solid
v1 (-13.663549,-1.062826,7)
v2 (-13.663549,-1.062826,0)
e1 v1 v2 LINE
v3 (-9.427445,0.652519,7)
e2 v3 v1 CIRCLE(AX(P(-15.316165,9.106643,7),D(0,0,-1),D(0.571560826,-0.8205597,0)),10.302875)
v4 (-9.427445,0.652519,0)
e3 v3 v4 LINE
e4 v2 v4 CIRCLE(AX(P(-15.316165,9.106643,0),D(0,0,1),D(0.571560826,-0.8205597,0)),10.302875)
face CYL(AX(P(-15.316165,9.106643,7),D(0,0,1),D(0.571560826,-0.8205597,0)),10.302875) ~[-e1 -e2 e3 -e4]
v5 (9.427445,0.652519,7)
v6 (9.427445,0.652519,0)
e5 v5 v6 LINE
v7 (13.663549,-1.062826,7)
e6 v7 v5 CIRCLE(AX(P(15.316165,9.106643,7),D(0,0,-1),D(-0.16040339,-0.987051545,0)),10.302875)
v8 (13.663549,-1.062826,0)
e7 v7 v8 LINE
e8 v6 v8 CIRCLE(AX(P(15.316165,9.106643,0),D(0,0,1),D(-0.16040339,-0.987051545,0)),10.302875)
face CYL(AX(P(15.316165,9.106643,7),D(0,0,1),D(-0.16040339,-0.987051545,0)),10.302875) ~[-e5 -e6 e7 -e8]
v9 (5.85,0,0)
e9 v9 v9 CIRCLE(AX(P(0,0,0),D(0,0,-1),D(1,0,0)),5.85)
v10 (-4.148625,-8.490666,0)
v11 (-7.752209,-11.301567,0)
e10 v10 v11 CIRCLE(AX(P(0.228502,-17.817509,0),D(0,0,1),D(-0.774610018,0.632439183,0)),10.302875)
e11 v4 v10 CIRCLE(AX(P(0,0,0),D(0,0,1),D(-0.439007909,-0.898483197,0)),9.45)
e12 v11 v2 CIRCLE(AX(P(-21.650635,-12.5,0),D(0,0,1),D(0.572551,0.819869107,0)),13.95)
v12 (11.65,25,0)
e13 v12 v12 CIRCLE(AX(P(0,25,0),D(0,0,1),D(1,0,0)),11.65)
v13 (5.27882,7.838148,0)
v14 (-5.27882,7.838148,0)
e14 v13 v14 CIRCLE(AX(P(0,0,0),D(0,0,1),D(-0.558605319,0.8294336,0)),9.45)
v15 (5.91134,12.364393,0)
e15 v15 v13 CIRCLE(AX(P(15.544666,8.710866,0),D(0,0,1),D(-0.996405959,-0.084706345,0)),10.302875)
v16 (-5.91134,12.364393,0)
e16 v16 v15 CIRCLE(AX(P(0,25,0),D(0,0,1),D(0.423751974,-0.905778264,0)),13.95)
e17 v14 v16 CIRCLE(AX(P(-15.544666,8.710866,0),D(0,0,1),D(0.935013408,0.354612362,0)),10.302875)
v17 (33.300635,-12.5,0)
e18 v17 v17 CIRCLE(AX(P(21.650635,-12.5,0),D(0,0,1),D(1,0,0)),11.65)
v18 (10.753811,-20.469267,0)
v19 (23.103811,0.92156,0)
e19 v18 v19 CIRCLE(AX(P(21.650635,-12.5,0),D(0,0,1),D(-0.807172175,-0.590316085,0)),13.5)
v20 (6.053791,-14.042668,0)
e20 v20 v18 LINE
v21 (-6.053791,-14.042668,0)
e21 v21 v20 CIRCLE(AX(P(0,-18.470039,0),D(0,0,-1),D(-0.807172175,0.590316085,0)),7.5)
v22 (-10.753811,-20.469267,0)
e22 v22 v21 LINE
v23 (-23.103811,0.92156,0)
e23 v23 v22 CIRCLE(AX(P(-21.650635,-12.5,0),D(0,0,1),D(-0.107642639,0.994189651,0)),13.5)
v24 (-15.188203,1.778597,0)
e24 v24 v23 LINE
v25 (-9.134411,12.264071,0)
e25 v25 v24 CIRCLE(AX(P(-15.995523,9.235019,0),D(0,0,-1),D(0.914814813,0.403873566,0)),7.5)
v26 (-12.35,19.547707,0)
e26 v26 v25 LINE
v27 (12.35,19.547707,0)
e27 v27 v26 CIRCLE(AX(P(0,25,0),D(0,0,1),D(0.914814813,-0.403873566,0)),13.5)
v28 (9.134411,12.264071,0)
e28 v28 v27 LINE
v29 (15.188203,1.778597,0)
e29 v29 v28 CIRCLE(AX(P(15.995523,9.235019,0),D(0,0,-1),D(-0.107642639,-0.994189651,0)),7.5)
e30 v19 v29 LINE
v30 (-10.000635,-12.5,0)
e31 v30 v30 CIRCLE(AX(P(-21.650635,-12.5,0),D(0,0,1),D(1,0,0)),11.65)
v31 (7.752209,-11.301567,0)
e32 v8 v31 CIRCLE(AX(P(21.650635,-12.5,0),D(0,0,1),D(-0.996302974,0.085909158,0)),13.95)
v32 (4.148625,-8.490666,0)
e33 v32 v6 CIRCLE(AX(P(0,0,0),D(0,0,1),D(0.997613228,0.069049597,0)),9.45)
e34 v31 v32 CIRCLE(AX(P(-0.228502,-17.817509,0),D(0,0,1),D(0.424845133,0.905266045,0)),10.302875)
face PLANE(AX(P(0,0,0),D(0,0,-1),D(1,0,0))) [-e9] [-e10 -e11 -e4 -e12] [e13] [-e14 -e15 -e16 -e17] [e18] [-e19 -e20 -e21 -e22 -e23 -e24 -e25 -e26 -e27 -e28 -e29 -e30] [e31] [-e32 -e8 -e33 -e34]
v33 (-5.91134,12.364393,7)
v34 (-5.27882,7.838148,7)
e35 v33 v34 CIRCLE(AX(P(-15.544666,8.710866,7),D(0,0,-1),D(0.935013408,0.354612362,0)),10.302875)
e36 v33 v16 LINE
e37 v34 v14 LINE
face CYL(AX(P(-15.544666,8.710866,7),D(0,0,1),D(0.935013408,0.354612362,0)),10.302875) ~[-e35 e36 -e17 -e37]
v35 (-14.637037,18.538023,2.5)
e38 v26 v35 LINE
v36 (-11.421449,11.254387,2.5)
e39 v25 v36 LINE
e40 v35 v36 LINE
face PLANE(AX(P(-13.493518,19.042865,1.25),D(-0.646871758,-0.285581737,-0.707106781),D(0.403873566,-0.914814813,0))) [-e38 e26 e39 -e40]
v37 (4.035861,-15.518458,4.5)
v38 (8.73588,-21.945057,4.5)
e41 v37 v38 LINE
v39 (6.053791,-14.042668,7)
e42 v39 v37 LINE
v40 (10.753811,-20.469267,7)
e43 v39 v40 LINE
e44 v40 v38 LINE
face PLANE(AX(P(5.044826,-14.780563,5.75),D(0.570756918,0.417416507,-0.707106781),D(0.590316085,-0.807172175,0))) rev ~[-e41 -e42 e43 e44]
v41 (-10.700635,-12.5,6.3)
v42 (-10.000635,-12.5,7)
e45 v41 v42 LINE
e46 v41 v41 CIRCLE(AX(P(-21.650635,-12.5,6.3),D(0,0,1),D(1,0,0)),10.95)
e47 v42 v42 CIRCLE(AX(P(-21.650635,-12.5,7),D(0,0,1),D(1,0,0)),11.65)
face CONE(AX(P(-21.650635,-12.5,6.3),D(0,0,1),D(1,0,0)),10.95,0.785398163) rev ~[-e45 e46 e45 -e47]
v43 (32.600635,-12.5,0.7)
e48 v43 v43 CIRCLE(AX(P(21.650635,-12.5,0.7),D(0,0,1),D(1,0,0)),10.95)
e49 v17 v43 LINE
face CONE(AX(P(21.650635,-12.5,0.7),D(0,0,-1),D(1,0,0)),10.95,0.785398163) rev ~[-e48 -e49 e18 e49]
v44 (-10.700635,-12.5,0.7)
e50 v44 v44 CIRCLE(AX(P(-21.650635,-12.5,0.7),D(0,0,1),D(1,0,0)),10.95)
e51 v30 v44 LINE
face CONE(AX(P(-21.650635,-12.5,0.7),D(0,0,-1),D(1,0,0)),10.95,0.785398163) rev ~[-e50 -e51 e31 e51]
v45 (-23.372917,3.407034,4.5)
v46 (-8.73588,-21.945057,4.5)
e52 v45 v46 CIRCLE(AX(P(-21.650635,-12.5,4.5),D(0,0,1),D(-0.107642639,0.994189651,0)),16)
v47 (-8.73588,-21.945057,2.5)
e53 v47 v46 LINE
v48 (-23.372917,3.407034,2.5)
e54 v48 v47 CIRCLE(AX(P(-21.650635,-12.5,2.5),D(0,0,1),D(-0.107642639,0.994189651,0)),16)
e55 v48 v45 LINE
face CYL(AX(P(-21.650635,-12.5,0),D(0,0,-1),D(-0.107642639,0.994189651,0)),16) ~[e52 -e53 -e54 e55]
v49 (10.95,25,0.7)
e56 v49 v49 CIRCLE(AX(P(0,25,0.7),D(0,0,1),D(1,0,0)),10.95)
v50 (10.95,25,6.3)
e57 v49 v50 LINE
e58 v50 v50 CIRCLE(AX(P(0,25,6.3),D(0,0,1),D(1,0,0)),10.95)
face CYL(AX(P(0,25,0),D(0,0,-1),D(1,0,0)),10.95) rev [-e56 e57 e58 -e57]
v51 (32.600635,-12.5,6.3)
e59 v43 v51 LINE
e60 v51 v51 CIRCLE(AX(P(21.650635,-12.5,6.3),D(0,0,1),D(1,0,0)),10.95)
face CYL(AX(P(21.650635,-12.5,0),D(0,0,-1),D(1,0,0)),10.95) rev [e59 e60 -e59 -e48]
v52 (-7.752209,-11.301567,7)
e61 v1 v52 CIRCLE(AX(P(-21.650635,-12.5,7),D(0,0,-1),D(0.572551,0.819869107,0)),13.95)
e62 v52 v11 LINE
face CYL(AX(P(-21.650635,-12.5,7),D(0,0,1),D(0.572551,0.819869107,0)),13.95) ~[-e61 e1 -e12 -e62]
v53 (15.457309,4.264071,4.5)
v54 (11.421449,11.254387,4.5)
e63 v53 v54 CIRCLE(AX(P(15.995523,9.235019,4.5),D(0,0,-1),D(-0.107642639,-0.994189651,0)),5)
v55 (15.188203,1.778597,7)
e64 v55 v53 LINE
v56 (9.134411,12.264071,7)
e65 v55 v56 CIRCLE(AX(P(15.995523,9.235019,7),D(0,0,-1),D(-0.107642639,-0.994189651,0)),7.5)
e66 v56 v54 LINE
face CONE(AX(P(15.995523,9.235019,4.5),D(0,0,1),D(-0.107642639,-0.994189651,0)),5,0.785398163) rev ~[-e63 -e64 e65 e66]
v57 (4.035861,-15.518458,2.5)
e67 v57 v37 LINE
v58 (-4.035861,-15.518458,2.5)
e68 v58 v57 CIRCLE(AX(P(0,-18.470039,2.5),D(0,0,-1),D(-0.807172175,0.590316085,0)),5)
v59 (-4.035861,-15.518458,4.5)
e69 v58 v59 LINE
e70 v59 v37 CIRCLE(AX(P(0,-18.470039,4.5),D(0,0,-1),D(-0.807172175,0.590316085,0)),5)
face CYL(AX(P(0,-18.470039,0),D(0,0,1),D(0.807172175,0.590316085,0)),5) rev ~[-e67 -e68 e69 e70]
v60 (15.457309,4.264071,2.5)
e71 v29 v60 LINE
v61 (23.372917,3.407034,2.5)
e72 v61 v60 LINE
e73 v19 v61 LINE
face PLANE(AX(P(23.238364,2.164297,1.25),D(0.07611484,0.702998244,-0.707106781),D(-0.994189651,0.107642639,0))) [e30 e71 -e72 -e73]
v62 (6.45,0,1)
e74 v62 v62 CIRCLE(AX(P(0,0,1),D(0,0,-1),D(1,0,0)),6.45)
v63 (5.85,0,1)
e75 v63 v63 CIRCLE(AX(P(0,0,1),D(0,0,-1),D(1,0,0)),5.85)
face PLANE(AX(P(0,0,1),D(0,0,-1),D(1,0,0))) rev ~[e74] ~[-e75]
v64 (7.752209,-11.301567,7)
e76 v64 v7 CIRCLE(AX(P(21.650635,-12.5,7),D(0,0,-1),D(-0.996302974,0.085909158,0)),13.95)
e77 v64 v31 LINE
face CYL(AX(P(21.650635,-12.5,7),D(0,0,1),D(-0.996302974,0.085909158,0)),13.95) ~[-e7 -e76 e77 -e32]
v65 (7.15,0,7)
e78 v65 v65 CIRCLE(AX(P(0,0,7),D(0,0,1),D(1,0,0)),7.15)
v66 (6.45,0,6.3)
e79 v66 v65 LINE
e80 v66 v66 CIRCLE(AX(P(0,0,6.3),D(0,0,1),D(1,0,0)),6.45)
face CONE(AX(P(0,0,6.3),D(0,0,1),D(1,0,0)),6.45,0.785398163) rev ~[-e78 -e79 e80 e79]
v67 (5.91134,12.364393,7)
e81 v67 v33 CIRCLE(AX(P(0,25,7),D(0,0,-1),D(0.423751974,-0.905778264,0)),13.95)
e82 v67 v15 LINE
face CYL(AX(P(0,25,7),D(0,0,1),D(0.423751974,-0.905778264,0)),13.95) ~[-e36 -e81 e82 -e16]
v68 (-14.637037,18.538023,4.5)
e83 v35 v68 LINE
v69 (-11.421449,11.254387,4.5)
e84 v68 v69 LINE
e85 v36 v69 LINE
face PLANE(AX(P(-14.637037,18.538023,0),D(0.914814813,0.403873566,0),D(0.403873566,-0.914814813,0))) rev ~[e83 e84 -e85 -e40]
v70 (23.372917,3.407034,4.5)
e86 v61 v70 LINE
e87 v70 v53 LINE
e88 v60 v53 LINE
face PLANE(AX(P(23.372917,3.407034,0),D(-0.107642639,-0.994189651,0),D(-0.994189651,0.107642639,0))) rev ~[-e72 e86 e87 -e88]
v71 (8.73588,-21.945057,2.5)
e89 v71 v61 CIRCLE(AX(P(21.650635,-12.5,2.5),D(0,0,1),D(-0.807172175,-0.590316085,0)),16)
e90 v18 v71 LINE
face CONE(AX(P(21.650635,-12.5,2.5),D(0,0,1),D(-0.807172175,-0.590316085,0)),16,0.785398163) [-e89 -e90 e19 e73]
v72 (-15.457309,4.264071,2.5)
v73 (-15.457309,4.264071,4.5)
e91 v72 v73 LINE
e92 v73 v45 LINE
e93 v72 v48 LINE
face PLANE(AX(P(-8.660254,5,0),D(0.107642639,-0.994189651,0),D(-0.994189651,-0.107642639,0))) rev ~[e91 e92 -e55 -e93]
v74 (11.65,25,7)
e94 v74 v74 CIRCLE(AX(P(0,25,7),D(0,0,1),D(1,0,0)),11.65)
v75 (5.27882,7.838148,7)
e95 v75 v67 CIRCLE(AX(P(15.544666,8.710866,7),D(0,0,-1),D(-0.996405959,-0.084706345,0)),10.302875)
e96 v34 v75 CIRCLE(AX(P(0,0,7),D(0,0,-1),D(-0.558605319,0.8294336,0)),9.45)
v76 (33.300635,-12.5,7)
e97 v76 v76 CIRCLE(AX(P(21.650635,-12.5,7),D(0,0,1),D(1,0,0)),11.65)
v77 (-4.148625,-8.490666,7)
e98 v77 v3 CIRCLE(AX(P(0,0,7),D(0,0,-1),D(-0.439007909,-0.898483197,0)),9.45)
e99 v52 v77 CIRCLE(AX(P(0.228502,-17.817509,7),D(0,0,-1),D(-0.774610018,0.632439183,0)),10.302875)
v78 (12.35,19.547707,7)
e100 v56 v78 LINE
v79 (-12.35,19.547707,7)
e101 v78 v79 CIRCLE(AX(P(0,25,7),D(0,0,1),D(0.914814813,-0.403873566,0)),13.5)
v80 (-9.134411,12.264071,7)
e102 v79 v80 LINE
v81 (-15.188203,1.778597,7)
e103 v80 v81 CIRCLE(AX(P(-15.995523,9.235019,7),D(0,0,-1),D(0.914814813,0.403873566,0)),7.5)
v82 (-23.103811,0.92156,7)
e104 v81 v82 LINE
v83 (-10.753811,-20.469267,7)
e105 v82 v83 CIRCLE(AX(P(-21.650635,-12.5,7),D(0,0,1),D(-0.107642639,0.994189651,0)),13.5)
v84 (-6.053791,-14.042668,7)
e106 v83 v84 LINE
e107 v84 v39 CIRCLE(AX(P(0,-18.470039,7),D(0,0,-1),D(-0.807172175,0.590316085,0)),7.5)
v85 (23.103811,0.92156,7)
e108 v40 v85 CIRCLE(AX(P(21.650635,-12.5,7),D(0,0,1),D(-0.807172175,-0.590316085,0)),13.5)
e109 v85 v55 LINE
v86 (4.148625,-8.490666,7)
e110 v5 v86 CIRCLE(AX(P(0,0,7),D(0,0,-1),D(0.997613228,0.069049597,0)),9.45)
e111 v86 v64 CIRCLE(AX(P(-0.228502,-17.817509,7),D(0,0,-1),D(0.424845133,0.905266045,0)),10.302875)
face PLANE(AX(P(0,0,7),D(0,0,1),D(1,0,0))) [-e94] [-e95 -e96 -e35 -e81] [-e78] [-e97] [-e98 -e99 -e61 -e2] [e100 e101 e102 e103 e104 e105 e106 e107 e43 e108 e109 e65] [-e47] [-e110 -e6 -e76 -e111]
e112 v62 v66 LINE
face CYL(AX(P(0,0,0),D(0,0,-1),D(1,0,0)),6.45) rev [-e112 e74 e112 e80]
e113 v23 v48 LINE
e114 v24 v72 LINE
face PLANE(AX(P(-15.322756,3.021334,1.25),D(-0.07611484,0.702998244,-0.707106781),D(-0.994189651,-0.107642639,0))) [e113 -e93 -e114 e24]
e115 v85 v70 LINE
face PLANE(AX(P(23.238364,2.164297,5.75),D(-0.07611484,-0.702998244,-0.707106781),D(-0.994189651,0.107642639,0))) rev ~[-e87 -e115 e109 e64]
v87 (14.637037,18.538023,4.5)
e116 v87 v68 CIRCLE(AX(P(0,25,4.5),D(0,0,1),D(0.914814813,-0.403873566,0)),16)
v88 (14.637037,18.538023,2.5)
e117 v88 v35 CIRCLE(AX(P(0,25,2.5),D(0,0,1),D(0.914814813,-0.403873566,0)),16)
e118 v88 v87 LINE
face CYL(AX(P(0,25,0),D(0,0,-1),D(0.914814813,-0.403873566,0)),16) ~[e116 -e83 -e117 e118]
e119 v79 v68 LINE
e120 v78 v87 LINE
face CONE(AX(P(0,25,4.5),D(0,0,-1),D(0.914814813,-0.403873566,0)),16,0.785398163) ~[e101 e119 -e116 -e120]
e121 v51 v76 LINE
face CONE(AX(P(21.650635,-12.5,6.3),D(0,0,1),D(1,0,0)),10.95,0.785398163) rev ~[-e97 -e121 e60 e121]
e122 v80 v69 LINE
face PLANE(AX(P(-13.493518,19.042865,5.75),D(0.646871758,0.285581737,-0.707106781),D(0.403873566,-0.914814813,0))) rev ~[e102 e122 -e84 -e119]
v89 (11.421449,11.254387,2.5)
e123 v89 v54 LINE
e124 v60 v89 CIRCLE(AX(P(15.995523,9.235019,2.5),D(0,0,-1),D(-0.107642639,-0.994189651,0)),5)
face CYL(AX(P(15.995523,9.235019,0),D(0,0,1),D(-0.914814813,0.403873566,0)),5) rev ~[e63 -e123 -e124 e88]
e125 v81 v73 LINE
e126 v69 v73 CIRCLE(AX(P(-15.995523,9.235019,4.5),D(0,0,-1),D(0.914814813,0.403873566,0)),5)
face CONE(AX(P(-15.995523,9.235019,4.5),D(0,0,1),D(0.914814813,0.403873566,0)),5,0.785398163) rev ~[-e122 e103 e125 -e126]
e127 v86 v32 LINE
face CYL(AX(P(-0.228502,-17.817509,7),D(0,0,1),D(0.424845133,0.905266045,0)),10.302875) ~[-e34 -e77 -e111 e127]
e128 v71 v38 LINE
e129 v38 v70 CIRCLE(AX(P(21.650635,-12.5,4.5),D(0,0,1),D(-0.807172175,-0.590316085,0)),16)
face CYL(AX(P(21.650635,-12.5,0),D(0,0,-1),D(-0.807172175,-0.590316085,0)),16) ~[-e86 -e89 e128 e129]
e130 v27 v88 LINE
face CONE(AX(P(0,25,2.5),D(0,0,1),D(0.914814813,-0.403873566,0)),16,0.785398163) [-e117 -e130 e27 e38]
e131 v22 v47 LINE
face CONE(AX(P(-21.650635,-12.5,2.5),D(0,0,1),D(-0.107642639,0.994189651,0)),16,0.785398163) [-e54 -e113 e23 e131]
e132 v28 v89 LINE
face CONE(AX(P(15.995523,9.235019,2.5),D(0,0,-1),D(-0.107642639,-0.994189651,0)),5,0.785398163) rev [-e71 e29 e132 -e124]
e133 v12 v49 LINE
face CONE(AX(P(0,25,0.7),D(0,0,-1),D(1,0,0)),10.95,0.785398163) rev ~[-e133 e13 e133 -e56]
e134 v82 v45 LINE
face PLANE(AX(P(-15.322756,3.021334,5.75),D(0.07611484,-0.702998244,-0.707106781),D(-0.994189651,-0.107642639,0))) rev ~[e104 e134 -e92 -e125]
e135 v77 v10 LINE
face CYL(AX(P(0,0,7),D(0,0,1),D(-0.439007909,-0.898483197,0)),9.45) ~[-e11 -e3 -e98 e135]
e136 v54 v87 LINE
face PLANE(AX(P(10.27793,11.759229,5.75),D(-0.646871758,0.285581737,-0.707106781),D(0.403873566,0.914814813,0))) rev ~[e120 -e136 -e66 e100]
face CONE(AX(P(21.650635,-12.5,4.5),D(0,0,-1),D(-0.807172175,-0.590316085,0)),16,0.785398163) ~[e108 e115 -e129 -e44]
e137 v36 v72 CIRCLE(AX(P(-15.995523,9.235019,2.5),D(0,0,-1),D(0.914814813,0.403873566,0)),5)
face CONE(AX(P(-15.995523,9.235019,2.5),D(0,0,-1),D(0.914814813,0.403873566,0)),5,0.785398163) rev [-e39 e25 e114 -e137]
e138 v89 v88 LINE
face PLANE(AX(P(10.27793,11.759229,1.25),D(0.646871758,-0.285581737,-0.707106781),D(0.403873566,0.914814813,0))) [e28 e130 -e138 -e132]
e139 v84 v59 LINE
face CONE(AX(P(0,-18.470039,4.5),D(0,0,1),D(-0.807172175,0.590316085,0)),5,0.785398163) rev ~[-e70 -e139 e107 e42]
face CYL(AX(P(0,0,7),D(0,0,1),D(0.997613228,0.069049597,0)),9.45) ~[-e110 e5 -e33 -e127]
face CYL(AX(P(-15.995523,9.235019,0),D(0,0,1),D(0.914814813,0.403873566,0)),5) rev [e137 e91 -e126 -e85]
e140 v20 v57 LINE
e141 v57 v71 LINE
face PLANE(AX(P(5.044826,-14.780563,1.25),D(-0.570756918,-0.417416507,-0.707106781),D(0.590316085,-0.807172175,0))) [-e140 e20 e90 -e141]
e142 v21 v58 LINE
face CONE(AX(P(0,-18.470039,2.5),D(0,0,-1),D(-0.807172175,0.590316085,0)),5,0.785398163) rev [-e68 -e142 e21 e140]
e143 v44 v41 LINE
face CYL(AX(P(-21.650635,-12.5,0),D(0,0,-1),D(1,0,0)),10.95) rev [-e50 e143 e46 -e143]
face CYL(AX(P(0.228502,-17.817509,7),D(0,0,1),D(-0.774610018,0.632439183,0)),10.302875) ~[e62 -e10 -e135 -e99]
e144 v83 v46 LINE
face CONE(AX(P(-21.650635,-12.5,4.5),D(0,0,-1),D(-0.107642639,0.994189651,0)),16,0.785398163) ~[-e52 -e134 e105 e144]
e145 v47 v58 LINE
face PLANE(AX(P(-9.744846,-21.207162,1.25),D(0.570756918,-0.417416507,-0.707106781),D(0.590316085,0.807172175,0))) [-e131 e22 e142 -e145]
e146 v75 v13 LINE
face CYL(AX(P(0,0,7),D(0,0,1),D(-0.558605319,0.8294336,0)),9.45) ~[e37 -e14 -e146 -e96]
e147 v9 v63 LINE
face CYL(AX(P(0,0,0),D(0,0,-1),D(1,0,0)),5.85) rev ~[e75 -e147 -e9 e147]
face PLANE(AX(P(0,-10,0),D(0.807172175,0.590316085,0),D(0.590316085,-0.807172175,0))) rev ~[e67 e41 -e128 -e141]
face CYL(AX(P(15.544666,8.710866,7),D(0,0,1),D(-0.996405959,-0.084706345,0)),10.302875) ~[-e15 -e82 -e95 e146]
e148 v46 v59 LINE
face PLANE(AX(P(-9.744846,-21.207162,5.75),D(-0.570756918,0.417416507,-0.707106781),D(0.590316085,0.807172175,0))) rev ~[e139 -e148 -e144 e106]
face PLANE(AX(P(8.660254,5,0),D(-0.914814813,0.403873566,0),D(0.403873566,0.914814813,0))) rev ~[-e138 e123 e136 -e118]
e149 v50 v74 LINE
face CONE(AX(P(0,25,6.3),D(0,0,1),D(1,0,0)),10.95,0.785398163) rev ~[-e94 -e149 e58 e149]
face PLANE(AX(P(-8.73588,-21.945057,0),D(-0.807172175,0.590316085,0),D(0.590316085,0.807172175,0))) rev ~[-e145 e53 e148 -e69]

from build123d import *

# Parameters (mm, degrees)
F0_R     = 10.95
F0_R_2   = 6.45
F1_DEPTH = 7
F2_R     = 5
F3_SIZE  = 2.5
F4_R     = 6.45
F4_R_2   = 5.85
F5_DEPTH = 1
F6_SIZE  = 0.7
F8_DEPTH = 25


with BuildPart() as f1:
    # F0 (on Top) → F1 (new body)
    with BuildSketch(Plane.XY):
        with BuildLine():
            Line((8.6602540378, 5), (14.6370370137, 18.538022945))
            ThreePointArc((14.6370370137, 18.538022945), (0, 41), (-14.6370370137, 18.538022945))
            Line((-14.6370370137, 18.538022945), (-8.6602540378, 5))
            Line((-8.6602540378, 5), (-23.3729173132, 3.4070344175))
            ThreePointArc((-23.3729173132, 3.4070344175), (-35.5070415552, -20.5), (-8.7358802995, -21.9450573625))
            Line((-8.7358802995, -21.9450573625), (0, -10))
            Line((0, -10), (8.7358802995, -21.9450573625))
            ThreePointArc((8.7358802995, -21.9450573625), (35.5070415552, -20.5), (23.3729173132, 3.4070344175))
            Line((23.3729173132, 3.4070344175), (8.6602540378, 5))
        make_face()
        with Locations((-21.6506350946, -12.5)):
            Circle(F0_R, mode=Mode.SUBTRACT)
        with Locations((21.6506350946, -12.5)):
            Circle(F0_R, mode=Mode.SUBTRACT)
        Circle(F0_R_2, mode=Mode.SUBTRACT)
        with Locations((0, 25)):
            Circle(F0_R, mode=Mode.SUBTRACT)
    extrude(amount=F1_DEPTH)

    # F2
    f2_edges = [f1.edges().sort_by_distance(p)[0] for p in [
        (0, -10, 3.5),
        (8.660254, 5, 3.5),
        (-8.660254, 5, 3.5),
    ]]
    fillet(f2_edges, radius=F2_R)

    # F3
    f3_edges = [f1.edges().sort_by_distance(p)[0] for p in [
        (-19.415113, 3.835553, 7),
        (-6.385871, -18.731758, 0),
        (19.415113, 3.835553, 0),
        (19.415113, 3.835553, 7),
        (11.665396, 6.735019, 0),
        (35.507042, -20.5, 0),
        (13.029243, 14.896205, 0),
        (6.385871, -18.731758, 0),
        (0, 41, 0),
        (0, -13.470039, 0),
        (-13.029243, 14.896205, 0),
        (-11.665396, 6.735019, 0),
        (-35.507042, -20.5, 0),
        (-19.415113, 3.835553, 0),
        (11.665396, 6.735019, 7),
        (35.507042, -20.5, 7),
        (13.029243, 14.896205, 7),
        (6.385871, -18.731758, 7),
        (0, 41, 7),
        (0, -13.470039, 7),
        (-13.029243, 14.896205, 7),
        (-6.385871, -18.731758, 7),
        (-11.665396, 6.735019, 7),
        (-35.507042, -20.5, 7),
    ]]
    chamfer(f3_edges, length=F3_SIZE)

    # F4 (on face) → F5 (join)
    with BuildSketch(Plane(origin=(0, 0, 0), x_dir=(1, 0, 0), z_dir=(0, 0, -1))):
        Circle(F4_R)
        Circle(F4_R_2, mode=Mode.SUBTRACT)
    extrude(amount=-F5_DEPTH)

    # F6
    f6_edges = [f1.edges().sort_by_distance(p)[0] for p in [
        (-6.45, 0, 7),
        (-32.600635, -12.5, 7),
        (10.700635, -12.5, 7),
        (-10.95, 25, 7),
        (-32.600635, -12.5, 0),
        (10.700635, -12.5, 0),
        (-10.95, 25, 0),
    ]]
    chamfer(f6_edges, length=F6_SIZE)

    # F7 (on face) → F8 (cut)
    with BuildSketch(Plane.XY.offset(7)):
        with BuildLine():
            ThreePointArc((-4.1486247409, -8.4906662141), (-8.1839400658, -4.725), (-9.4274450069, 0.6525186907))
            ThreePointArc((-9.4274450069, 0.6525186907), (-11.4491842198, -0.4430009845), (-13.6635486442, -1.0628259595))
            ThreePointArc((-13.6635486442, -1.0628259595), (-9.5695807118, -5.525), (-7.7522086028, -11.3015672519))
            ThreePointArc((-7.7522086028, -11.3015672519), (-6.1082422164, -9.6937838947), (-4.1486247409, -8.4906662141))
        make_face()
        with BuildLine():
            ThreePointArc((-5.278820266, 7.8381475234), (0, 9.45), (5.278820266, 7.8381475234))
            ThreePointArc((5.278820266, 7.8381475234), (5.3409420034, 10.1367848792), (5.9113400414, 12.3643932114))
            ThreePointArc((5.9113400414, 12.3643932114), (0, 11.05), (-5.9113400414, 12.3643932114))
            ThreePointArc((-5.9113400414, 12.3643932114), (-5.3409420034, 10.1367848792), (-5.278820266, 7.8381475234))
        make_face()
        with BuildLine():
            ThreePointArc((9.4274450069, 0.6525186907), (8.1839400658, -4.725), (4.1486247409, -8.4906662141))
            ThreePointArc((4.1486247409, -8.4906662141), (6.1082422164, -9.6937838947), (7.7522086028, -11.3015672519))
            ThreePointArc((7.7522086028, -11.3015672519), (9.5695807118, -5.525), (13.6635486442, -1.0628259595))
            ThreePointArc((13.6635486442, -1.0628259595), (11.4491842198, -0.4430009845), (9.4274450069, 0.6525186907))
        make_face()
    extrude(amount=-F8_DEPTH, mode=Mode.SUBTRACT)


solid = f1.part
